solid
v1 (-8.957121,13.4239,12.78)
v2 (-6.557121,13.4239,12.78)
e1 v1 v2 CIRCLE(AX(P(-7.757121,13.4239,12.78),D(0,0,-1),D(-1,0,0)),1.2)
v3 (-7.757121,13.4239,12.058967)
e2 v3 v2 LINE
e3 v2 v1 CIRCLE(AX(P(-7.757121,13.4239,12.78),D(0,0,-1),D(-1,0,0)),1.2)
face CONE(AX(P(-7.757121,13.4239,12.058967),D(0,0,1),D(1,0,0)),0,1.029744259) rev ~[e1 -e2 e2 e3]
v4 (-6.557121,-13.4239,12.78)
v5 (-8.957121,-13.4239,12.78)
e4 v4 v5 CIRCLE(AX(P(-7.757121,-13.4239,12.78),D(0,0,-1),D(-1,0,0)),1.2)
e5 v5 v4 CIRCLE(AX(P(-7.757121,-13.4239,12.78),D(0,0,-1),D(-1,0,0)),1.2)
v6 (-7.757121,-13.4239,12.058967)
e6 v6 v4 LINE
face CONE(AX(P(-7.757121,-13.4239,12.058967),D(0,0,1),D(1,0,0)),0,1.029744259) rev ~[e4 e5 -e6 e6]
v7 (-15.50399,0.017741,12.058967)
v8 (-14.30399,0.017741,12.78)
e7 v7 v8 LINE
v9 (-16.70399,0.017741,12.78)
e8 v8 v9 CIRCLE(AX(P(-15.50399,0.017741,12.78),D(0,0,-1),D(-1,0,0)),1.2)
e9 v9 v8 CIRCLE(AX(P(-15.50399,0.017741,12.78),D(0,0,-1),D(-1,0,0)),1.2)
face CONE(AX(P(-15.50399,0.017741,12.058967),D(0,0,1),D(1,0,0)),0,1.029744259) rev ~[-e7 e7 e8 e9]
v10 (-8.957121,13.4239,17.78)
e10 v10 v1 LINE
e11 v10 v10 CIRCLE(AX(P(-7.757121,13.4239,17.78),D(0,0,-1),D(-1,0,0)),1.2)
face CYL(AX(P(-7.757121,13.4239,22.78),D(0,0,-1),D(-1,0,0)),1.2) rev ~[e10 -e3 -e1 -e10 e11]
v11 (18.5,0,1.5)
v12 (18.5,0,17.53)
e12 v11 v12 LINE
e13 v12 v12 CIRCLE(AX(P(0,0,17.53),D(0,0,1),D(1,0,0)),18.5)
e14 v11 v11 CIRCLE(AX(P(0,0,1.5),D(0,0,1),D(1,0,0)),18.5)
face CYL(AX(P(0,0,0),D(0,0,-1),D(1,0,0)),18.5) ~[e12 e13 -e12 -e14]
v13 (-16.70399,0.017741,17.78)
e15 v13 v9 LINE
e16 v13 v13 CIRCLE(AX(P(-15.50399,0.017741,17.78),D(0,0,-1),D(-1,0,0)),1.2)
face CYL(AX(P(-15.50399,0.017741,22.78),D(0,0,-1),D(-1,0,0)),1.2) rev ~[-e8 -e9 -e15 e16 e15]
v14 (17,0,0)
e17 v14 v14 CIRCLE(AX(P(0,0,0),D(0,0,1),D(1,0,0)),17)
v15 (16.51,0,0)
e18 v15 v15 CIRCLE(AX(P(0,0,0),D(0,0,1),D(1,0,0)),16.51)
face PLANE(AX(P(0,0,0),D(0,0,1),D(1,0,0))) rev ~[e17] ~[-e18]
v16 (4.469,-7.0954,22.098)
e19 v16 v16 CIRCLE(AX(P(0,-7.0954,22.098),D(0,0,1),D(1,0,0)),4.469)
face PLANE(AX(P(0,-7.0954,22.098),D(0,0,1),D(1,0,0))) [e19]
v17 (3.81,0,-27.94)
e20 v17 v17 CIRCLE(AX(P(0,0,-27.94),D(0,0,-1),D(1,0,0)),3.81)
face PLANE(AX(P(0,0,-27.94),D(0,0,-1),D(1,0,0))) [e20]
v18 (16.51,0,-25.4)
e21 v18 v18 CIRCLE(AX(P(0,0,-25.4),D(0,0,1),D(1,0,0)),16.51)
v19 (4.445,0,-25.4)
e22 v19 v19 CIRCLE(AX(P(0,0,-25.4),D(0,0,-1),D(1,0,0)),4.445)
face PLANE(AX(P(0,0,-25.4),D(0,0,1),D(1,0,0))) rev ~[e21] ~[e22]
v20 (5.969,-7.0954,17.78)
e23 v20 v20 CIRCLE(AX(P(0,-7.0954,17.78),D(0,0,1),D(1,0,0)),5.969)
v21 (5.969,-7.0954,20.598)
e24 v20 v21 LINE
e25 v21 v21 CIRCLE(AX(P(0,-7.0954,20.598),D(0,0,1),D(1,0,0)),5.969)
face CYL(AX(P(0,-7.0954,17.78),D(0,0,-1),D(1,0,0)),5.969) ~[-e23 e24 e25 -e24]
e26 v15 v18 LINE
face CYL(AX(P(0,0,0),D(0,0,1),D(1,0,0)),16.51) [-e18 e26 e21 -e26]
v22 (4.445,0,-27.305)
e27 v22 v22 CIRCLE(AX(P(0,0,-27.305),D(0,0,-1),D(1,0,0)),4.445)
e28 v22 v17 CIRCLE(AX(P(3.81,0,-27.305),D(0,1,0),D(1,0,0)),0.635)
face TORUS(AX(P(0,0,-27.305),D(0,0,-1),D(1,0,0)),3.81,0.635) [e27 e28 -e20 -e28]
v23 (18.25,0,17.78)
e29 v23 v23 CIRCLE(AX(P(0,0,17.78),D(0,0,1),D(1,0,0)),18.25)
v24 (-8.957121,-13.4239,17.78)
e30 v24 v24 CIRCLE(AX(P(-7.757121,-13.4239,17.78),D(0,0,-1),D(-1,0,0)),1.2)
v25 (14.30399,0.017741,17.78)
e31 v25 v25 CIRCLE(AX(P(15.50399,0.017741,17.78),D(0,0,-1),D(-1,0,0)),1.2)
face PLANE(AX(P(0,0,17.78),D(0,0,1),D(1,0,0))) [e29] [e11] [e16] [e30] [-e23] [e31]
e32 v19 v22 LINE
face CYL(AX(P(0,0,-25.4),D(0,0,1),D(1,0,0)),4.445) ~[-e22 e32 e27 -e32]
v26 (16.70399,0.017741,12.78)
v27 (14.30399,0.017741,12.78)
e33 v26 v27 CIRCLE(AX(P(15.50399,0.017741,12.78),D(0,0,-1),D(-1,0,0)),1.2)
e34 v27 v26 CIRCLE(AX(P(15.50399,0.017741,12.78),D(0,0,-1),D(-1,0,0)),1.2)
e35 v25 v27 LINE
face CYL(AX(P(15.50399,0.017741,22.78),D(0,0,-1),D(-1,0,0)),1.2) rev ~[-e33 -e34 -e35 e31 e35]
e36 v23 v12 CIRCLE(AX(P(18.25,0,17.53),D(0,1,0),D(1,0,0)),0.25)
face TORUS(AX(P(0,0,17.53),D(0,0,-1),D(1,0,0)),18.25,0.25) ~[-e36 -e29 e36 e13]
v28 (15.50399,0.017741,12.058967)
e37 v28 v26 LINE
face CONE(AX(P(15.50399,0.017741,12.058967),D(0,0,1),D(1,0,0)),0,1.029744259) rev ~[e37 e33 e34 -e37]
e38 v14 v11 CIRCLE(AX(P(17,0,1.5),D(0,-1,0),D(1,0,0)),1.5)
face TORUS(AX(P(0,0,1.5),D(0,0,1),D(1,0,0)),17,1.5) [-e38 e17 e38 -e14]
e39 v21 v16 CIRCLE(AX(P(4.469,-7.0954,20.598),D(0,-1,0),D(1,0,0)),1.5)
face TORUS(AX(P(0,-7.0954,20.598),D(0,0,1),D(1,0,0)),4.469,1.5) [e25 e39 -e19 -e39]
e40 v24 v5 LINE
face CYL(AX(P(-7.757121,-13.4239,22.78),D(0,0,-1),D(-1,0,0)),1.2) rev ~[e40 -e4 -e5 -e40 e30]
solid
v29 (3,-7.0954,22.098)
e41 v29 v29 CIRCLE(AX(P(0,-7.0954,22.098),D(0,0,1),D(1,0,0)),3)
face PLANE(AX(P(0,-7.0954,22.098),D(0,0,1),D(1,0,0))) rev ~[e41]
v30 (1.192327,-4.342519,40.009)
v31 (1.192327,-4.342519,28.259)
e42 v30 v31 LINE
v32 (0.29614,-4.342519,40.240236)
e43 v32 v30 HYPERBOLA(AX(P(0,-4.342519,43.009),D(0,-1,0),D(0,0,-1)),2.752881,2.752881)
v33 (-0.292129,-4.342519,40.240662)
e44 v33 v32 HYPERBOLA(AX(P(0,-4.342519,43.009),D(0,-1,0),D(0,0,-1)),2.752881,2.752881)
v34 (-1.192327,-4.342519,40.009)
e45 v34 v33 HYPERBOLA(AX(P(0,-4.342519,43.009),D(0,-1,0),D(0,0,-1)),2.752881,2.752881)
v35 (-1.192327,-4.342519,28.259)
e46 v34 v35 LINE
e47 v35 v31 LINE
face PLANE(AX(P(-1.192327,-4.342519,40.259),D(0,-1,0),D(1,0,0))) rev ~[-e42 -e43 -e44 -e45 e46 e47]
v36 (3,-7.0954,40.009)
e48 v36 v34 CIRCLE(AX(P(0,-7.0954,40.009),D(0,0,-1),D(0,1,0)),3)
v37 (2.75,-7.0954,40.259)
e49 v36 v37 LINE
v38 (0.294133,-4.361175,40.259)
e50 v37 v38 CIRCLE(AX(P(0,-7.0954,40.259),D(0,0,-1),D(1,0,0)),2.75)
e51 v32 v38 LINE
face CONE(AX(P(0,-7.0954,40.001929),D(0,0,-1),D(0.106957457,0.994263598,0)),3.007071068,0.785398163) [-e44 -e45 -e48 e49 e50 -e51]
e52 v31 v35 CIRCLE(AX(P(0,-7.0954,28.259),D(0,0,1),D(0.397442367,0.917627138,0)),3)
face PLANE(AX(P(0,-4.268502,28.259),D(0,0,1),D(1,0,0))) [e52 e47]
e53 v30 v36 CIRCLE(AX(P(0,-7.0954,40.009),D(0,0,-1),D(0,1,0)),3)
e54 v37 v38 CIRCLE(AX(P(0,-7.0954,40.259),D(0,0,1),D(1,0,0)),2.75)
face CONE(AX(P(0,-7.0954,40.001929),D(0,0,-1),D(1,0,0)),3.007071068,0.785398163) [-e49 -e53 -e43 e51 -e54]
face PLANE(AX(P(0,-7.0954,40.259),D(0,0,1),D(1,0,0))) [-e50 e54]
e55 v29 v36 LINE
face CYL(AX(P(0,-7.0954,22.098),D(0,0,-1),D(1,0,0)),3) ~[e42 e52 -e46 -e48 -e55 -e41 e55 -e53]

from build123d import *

# Parameters (mm, degrees)
F0_R         = 18.5
F0_R_2       = 16.51
F1_DEPTH     = 17.78
F2_R         = 5.969
F3_DEPTH     = 4.318
F4_R         = 3
F5_DEPTH     = 18.161
F7_DEPTH     = 12
F8_DEPTH     = 25.4
F9_R         = 4.445
F10_DEPTH    = 2.54
F11_R        = 0.635
F12_R        = 1.5
F13_R        = 1.5
F14_R        = 0.25
F15_T2_ANGLE = 276.1399558047
F15_T4_ANGLE = 96.0574088809
F16_D        = 2.4
F16_DEPTH    = 5
F16_TIP      = 0.7210327428


# Not quite as in the source:
# - a fillet or chamfer that OpenCascade refuses, or shapes differently, is made with other operations: its cross-section is extruded or revolved along the edge and cut away or added


with BuildPart() as f1:
    # F0 (on Top) → F1 (new body)
    with BuildSketch(Plane.XY):
        Circle(F0_R)
        Circle(F0_R_2, mode=Mode.SUBTRACT)
        Circle(F0_R_2)
    extrude(amount=F1_DEPTH)

    # F2 (on face) → F3 (join)
    with BuildSketch(Plane.XY.offset(17.78)):
        with Locations((0, -7.0954)):
            Circle(F2_R)
    extrude(amount=F3_DEPTH)

    # F0 (on Top) → F8 (join)
    with BuildSketch(Plane.XY):
        Circle(F0_R_2)
    extrude(amount=-F8_DEPTH)

    # F9 (on face) → F10 (join)
    with BuildSketch(Plane(origin=(0, 0, -25.4), x_dir=(1, 0, 0), z_dir=(0, 0, -1))):
        Circle(F9_R)
    extrude(amount=F10_DEPTH)

    # F11
    f11_edges = [f1.edges().sort_by_distance(p)[0] for p in [
        (-4.445, 0, -27.94),
    ]]
    fillet(f11_edges, radius=F11_R)

    # F12
    f12_edges = [f1.edges().sort_by_distance(p)[0] for p in [
        (-18.5, 0, 0),
    ]]
    fillet(f12_edges, radius=F12_R)

    # F13
    f13_edges = [f1.edges().sort_by_distance(p)[0] for p in [
        (-5.969, -7.0954, 22.098),
    ]]
    fillet(f13_edges, radius=F13_R)

    # F14
    f14_edges = [f1.edges().sort_by_distance(p)[0] for p in [
        (-18.5, 0, 17.78),
    ]]
    fillet(f14_edges, radius=F14_R)

    # F16
    with Locations(Plane.XY.offset(17.78)):
        with Locations((-7.7571209086, 13.4239), (-7.7571209086, -13.4239), (15.5039898493, 0.0177412977), (-15.5039898493, 0.0177412977)):
            Hole(F16_D / 2, depth=F16_DEPTH)
            with Locations((0, 0, -(F16_DEPTH + F16_TIP / 2))):  # 118° drill point
                Cone(0, F16_D / 2, F16_TIP, mode=Mode.SUBTRACT)


with BuildPart() as f5:
    # F4 (on face) → F5 (new body)
    with BuildSketch(Plane.XY.offset(22.098)):
        with Locations((0, -7.0954)):
            Circle(F4_R)
    extrude(amount=F5_DEPTH)

    # F6 (on face) → F7 (cut)
    with BuildSketch(Plane.XY.offset(40.259)):
        with BuildLine():
            ThreePointArc((1.1923271, -4.3425185847), (0, -4.0954), (-1.1923271, -4.3425185847))
            Line((-1.1923271, -4.3425185847), (1.1923271, -4.3425185847))
        make_face()
    extrude(amount=-F7_DEPTH, mode=Mode.SUBTRACT)

    # F15: chamfer of 0.25 on 2 edges, made by hand

    # F15_s1 → F15_t2 (revolve, cut)
    with BuildSketch(Plane(origin=(0.7545525529, -0.0811706499, 0), x_dir=(0, 0, 1), z_dir=(0.994263598, -0.1069574573, 0))):
        with BuildLine():
            Line((40.0019289322, 4.0476268655), (40.2660710678, 4.3117690011))
            Line((40.2660710678, 4.3117690011), (40.2710710678, 4.3117690011))
            ThreePointArc((40.2710710678, 4.3117690011), (40.264, 4.1832334672), (40.264, 4.0546979333))
            Line((40.264, 4.0546979333), (40.259, 4.0496979333))
            ThreePointArc((40.259, 4.0496979333), (40.1304644661, 4.0496979333), (40.0019289322, 4.0426268655))
            Line((40.0019289322, 4.0426268655), (40.0019289322, 4.0476268655))
        make_face()
    revolve(axis=Axis((0, -7.0954, 40.259), (0, 0, 1)), revolution_arc=F15_T2_ANGLE, mode=Mode.SUBTRACT)

    # F15_s3 → F15_t4 (revolve, cut)
    with BuildSketch(Plane.XZ.offset(7.0954)):
        with BuildLine():
            Line((3.0070710678, 40.0019289322), (2.7429289322, 40.2660710678))
            Line((2.7429289322, 40.2660710678), (2.7429289322, 40.2710710678))
            ThreePointArc((2.7429289322, 40.2710710678), (2.8714644661, 40.264), (3, 40.264))
            Line((3, 40.264), (3.005, 40.259))
            ThreePointArc((3.005, 40.259), (3.005, 40.1304644661), (3.0120710678, 40.0019289322))
            Line((3.0120710678, 40.0019289322), (3.0070710678, 40.0019289322))
        make_face()
    revolve(axis=Axis((0, -7.0954, 40.259), (0, 0, 1)), revolution_arc=F15_T4_ANGLE, mode=Mode.SUBTRACT)


solid = Compound([f1.part, f5.part])
